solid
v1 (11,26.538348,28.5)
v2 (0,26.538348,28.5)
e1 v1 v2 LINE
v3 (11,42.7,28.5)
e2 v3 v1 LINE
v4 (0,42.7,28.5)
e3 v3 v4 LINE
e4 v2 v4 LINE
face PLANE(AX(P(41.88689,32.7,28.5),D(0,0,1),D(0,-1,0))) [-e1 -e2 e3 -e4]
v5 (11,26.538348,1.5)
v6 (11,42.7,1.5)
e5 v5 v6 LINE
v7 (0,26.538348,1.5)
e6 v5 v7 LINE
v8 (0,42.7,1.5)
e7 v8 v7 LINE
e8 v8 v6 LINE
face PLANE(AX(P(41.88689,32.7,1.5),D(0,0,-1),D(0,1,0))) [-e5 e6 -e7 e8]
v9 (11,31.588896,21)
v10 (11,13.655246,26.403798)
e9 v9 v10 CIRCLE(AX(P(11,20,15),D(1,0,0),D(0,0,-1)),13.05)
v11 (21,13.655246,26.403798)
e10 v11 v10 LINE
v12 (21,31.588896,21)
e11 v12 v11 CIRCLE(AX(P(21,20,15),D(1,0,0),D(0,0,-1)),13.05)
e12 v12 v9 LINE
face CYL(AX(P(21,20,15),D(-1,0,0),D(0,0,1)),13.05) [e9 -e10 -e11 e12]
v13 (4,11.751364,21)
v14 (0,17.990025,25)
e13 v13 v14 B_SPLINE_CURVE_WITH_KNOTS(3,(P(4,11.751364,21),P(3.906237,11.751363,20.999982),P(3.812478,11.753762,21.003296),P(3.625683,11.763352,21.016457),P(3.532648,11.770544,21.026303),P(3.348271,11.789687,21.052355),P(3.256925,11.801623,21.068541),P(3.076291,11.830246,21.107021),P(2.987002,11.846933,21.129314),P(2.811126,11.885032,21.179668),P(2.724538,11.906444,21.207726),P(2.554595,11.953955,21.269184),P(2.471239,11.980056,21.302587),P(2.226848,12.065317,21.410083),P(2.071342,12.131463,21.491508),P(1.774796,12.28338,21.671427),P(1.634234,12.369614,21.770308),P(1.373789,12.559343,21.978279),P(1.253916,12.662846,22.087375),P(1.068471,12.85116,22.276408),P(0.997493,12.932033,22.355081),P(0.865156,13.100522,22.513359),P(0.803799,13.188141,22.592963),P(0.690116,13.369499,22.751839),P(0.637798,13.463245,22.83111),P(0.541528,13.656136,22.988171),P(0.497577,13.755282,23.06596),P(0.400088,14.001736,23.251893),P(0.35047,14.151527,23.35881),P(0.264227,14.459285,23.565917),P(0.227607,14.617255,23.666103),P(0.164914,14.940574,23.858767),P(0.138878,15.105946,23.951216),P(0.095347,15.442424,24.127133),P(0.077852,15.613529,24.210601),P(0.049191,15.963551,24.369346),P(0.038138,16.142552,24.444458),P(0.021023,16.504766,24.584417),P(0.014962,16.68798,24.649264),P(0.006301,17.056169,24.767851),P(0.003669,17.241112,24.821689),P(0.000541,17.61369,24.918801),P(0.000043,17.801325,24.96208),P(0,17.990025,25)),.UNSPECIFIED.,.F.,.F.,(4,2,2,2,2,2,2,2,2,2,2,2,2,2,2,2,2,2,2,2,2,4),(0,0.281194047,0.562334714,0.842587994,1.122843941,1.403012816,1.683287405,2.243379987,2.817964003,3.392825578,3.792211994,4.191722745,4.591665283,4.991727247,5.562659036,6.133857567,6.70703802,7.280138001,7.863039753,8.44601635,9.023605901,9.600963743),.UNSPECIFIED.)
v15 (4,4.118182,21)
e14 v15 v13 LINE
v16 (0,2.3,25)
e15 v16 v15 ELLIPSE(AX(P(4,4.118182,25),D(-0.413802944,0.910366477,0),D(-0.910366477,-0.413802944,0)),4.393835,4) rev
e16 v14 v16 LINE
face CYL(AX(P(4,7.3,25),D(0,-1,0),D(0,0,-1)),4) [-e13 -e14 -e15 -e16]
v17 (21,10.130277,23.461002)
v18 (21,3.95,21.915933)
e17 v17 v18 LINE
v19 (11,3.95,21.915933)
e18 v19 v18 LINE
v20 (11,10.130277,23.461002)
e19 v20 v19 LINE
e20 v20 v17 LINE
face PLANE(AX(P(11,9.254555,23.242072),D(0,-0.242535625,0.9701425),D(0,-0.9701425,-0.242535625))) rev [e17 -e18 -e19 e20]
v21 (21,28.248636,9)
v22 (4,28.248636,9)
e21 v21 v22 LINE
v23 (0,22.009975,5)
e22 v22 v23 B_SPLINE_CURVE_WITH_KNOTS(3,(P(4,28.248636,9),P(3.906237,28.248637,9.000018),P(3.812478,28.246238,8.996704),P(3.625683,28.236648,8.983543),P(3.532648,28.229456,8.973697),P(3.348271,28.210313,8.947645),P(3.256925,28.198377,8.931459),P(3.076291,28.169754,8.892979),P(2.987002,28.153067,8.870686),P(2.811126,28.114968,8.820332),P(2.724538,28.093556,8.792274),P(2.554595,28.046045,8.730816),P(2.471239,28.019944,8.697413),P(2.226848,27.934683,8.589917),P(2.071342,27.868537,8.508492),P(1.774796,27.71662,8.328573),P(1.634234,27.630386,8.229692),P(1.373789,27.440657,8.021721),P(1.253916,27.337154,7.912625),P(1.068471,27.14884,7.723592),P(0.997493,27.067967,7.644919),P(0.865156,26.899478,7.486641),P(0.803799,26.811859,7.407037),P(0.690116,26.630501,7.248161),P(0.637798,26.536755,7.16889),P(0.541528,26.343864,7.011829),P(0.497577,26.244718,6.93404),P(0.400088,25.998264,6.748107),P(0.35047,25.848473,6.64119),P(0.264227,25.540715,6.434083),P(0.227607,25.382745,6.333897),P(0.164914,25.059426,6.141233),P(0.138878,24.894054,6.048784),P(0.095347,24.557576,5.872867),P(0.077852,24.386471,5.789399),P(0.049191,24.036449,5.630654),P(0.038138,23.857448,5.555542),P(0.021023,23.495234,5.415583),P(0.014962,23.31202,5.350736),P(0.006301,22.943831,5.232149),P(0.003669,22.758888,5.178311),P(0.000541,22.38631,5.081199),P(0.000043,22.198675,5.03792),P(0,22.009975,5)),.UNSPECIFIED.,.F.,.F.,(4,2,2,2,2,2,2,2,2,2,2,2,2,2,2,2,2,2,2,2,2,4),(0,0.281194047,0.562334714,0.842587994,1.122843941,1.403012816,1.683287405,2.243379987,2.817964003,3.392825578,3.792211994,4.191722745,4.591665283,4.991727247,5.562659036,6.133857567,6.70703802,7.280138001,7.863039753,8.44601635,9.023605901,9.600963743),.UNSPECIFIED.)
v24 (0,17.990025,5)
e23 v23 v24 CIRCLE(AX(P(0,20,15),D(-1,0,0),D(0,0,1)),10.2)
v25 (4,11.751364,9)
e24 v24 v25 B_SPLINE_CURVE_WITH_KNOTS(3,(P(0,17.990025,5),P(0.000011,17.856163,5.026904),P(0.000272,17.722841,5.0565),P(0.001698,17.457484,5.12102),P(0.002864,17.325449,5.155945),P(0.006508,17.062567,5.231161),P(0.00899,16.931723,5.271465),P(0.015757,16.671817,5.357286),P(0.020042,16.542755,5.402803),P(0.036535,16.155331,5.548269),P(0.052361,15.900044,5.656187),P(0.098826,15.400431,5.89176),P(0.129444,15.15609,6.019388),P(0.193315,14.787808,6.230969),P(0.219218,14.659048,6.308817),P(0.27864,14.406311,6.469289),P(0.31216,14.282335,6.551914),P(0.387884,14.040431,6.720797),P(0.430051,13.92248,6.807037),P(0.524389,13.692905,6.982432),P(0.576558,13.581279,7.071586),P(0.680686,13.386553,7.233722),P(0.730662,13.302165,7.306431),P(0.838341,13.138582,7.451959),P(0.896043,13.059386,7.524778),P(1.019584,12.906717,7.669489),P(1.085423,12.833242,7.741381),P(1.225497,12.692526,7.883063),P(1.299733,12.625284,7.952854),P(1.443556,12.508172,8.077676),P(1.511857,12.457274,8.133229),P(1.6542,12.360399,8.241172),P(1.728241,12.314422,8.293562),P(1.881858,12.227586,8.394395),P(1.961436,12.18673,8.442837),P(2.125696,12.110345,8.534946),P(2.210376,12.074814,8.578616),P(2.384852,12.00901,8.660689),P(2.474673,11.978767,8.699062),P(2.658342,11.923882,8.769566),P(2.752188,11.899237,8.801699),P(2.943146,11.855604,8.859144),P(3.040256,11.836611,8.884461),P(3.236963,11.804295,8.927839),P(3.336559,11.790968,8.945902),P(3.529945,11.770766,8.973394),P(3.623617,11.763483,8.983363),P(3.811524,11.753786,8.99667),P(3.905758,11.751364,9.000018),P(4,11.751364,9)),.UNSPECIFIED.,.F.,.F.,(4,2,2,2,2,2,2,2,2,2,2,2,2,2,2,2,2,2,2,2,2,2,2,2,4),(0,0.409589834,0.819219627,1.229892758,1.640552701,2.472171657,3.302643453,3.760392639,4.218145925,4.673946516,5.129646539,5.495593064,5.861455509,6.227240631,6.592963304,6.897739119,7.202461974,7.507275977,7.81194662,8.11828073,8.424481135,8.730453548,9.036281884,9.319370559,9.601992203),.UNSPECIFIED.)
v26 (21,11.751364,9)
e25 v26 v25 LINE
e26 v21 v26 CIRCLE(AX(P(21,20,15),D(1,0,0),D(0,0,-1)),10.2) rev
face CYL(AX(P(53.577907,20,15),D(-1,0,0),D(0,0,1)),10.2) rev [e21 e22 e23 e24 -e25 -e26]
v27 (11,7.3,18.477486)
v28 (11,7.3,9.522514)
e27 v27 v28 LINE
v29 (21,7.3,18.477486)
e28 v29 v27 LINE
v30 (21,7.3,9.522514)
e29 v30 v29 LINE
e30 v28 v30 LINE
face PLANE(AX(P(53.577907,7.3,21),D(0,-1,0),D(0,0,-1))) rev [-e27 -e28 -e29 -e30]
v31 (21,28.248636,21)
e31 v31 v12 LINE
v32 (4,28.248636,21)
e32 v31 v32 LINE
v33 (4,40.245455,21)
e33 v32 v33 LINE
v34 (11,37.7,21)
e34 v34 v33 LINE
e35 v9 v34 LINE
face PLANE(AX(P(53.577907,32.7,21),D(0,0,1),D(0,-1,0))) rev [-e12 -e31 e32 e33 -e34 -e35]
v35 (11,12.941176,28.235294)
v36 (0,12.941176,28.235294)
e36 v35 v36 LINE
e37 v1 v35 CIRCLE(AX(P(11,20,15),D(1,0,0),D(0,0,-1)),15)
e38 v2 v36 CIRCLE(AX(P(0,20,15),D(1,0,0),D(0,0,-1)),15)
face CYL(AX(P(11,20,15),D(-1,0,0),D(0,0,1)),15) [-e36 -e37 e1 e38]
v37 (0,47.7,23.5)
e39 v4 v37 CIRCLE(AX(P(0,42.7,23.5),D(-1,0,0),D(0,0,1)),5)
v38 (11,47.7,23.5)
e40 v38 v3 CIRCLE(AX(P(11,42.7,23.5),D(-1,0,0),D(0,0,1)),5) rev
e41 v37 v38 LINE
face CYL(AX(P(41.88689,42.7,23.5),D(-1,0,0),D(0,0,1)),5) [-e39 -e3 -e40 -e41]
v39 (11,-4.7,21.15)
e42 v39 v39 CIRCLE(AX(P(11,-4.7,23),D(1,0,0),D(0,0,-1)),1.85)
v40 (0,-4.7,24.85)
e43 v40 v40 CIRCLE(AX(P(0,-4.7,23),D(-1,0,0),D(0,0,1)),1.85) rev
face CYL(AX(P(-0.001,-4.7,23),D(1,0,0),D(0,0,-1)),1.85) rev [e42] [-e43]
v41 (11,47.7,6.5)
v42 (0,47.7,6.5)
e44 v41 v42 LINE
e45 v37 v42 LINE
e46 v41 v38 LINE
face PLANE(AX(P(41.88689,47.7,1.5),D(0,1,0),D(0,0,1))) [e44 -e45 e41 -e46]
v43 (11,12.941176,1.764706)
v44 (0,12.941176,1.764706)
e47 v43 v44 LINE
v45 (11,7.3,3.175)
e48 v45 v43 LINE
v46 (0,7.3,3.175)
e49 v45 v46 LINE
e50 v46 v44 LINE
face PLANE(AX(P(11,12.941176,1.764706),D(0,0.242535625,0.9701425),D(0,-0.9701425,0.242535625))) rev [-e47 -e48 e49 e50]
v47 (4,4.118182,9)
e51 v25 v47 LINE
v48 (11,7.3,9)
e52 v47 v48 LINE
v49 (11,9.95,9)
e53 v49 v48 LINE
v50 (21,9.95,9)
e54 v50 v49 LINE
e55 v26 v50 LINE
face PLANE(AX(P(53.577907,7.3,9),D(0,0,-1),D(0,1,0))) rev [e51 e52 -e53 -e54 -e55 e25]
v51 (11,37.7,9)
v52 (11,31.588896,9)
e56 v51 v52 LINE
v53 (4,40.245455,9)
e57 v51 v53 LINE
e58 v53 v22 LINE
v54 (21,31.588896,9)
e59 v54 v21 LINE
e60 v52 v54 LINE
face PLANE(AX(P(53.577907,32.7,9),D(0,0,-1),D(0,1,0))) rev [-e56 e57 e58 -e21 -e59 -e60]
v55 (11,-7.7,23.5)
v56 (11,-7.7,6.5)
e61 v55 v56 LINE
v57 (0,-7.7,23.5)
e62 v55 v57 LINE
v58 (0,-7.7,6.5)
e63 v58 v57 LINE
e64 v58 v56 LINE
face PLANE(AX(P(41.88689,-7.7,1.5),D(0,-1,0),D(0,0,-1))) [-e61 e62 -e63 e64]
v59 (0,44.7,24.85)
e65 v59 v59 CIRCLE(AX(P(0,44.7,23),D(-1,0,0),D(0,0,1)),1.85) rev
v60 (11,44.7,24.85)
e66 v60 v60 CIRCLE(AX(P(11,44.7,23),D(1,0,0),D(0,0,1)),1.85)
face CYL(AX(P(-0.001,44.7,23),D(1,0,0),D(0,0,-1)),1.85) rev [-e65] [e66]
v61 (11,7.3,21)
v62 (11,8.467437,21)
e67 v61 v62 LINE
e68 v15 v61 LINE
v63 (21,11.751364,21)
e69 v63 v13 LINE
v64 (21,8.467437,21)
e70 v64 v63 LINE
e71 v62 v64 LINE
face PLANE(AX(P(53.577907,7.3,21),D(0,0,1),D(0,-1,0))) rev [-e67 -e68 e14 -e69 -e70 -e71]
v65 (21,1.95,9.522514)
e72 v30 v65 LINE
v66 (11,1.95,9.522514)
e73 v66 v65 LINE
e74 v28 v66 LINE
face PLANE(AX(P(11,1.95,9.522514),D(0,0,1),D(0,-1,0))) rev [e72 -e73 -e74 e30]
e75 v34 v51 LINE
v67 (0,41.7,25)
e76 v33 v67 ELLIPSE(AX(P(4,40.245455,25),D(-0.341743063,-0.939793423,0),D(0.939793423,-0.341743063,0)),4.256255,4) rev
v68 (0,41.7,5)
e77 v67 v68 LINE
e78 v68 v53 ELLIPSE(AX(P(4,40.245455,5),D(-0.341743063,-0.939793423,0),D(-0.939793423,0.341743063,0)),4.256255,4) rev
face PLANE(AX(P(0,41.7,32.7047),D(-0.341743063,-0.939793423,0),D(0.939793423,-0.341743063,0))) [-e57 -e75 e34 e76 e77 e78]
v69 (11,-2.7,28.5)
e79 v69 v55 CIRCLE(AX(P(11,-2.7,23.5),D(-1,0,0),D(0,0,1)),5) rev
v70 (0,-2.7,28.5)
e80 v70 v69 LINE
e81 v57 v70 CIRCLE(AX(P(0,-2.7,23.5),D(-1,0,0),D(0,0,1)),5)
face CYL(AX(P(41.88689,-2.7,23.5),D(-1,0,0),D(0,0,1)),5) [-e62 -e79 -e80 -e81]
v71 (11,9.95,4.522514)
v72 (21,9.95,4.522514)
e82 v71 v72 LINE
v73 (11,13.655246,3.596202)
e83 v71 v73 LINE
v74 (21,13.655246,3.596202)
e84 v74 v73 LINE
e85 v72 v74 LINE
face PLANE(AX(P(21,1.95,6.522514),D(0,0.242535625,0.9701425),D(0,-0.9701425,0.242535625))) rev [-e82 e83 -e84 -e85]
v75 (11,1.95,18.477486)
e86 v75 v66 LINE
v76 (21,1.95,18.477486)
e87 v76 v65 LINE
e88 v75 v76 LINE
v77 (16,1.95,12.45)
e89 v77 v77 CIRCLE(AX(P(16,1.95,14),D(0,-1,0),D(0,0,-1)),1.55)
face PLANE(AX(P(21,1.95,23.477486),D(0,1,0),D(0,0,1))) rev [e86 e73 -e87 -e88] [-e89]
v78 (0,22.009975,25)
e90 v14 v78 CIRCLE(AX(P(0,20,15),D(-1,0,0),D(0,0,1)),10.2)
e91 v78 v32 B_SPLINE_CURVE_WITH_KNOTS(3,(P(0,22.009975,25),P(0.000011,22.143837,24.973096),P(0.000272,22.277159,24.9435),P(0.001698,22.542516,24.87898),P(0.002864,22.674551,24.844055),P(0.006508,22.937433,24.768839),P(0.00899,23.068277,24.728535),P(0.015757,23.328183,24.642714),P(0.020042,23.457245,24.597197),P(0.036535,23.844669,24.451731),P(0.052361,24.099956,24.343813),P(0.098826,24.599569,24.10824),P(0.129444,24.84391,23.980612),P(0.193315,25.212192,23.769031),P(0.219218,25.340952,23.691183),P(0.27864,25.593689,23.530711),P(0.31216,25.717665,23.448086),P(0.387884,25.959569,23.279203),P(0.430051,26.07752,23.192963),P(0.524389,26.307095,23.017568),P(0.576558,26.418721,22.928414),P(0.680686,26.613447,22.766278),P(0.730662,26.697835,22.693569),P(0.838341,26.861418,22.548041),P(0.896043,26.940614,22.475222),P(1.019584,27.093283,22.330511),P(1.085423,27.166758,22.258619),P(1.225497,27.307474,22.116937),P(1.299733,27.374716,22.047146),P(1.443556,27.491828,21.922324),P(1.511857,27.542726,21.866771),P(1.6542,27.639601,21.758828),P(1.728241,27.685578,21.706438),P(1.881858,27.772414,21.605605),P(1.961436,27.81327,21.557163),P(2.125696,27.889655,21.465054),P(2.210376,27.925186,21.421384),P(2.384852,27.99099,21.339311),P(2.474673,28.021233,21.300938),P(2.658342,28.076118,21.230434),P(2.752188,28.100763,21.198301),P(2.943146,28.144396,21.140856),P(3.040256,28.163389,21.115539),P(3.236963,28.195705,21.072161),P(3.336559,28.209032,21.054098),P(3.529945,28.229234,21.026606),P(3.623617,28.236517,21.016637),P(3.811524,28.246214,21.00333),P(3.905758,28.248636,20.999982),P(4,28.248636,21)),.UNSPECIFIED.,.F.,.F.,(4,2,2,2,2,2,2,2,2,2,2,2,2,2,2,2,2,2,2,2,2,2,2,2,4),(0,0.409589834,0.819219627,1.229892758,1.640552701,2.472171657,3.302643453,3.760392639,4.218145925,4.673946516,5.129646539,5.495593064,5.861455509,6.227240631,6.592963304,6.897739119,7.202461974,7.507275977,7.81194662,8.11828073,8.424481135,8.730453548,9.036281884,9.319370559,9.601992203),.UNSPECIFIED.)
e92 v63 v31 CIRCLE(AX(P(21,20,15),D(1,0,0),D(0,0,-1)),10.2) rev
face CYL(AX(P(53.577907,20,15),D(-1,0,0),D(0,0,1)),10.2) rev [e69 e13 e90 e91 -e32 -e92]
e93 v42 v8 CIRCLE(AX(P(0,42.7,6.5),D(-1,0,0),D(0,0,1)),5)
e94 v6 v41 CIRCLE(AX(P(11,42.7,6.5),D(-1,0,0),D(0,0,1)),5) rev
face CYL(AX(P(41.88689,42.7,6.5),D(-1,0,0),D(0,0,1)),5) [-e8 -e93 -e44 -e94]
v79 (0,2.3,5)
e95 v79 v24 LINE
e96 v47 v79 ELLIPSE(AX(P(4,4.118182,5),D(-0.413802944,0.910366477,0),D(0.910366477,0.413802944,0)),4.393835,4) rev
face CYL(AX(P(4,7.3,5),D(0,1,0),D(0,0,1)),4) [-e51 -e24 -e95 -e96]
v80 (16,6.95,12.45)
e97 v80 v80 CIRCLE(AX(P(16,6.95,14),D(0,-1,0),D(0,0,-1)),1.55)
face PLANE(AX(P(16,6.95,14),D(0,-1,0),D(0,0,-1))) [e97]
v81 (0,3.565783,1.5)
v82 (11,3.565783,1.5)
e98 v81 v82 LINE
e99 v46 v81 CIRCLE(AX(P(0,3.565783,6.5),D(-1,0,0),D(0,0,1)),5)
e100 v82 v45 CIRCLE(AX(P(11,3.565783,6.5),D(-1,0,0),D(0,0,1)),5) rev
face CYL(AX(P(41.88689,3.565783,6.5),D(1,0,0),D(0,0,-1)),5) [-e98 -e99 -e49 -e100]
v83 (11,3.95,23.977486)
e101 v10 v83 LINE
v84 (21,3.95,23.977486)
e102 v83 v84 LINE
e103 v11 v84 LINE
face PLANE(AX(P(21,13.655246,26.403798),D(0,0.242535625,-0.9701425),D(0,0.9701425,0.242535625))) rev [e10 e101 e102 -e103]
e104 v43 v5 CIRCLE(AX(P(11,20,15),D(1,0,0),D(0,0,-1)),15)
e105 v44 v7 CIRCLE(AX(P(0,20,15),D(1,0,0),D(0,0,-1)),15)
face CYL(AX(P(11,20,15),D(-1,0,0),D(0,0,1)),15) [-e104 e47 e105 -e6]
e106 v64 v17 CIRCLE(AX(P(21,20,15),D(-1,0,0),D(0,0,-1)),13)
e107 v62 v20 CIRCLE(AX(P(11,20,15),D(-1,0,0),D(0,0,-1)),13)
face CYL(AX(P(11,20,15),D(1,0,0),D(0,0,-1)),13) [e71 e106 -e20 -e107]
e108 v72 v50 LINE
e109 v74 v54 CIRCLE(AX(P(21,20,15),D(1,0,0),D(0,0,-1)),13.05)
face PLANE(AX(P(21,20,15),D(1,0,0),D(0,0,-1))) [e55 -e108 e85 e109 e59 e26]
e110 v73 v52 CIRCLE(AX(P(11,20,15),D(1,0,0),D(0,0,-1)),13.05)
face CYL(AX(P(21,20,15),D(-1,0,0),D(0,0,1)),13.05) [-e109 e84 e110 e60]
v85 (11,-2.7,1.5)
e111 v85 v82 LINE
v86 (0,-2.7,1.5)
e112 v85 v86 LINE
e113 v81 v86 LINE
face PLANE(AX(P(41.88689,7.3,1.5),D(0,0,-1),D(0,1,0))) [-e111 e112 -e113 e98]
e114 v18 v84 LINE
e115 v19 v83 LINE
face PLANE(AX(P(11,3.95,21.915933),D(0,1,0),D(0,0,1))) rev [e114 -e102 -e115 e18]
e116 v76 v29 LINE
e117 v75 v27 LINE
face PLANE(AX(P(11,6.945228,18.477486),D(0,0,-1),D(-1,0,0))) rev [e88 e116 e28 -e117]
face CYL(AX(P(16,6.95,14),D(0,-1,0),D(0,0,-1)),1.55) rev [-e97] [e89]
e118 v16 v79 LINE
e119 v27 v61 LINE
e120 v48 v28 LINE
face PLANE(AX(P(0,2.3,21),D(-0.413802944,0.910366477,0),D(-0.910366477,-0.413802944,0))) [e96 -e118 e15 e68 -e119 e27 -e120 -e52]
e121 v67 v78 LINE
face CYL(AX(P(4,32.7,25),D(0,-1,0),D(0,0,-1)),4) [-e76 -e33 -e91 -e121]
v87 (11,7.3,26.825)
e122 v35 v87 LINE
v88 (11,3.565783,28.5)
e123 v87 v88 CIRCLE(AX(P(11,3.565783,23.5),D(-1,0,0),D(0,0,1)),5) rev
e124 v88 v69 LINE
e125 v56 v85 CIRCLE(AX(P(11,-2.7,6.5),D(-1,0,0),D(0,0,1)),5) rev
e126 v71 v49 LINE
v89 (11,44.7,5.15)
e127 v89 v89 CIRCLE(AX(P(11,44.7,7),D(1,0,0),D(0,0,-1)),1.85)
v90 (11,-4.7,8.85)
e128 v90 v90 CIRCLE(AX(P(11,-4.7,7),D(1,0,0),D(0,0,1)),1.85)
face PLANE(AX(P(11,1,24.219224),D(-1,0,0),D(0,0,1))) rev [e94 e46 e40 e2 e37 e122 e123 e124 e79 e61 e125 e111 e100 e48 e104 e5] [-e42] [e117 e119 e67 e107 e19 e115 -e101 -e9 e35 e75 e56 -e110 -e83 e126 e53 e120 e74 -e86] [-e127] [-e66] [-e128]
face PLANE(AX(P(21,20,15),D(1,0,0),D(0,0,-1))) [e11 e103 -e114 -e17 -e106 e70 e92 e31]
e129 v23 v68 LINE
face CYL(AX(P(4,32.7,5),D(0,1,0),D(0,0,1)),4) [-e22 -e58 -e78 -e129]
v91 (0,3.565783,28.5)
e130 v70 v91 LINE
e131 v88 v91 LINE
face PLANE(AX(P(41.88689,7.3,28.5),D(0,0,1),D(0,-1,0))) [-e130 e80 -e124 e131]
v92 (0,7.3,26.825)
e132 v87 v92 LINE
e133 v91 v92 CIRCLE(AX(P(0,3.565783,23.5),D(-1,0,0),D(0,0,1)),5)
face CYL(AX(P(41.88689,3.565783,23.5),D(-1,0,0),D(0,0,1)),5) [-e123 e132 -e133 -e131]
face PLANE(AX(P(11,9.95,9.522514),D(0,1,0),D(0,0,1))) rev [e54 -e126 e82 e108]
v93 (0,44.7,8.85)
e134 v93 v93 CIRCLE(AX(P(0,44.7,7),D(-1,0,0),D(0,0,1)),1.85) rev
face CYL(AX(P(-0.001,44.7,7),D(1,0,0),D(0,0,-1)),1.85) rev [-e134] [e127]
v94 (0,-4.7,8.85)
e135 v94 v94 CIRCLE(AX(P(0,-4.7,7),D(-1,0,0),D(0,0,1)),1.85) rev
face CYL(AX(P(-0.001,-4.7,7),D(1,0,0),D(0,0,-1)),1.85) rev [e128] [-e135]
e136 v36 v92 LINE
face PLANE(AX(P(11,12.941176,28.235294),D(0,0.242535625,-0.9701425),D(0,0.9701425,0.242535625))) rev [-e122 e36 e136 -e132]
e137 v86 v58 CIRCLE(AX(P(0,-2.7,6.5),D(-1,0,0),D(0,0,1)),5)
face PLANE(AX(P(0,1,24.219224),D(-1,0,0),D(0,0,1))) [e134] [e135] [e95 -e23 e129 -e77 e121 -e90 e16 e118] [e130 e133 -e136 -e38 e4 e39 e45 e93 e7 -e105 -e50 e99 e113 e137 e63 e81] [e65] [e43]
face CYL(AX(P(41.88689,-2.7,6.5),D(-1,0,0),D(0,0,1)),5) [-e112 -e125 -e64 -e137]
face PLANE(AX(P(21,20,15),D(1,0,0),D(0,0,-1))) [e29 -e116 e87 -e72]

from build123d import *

# Parameters (mm, degrees)
CROQUIS1_R              = 10
SALIENTE_EXTRUIR1_DEPTH = 11
CROQUIS2_R              = 10
SALIENTE_EXTRUIR2_DEPTH = 10
CORTAR_EXTRUIR3_DEPTH   = 10
CROQUIS8_R              = 1.55
CORTAR_EXTRUIR4_DEPTH   = 5
CORTAR_EXTRUIR5_REACH   = 52.656
CORTAR_EXTRUIR6_START   = -10
CORTAR_EXTRUIR6_DEPTH   = 10
SALIENTE_EXTRUIR5_DEPTH = 11
CORTAR_EXTRUIR9_REACH   = 59.413
CROQUIS19_R             = 1.85
SALIENTE_EXTRUIR7_DEPTH = 11
CROQUIS22_W             = 11
CROQUIS22_H             = 5
CORTAR_EXTRUIR10_DEPTH  = 12
CORTAR_EXTRUIR11_DEPTH  = 12
REDONDEO1_R             = 4
REDONDEO2_R             = 5
REDONDEO3_R             = 5


with BuildPart() as part:
    # Croquis1 → Saliente-Extruir1 (new body)
    with BuildSketch(Plane(origin=(0, 0, 0), x_dir=(0, 0, -1), z_dir=(1, 0, 0))):
        with BuildLine():
            Line((-5.780776406, 0), (-24.219223594, 0))
            ThreePointArc((-24.219223594, 0), (-24.834635803, 0.211794562), (-25.189366094, 0.757464375))
            Line((-25.189366094, 0.757464375), (-28.235294118, 12.941176471))
            ThreePointArc((-28.235294118, 12.941176471), (-15, 35), (-1.764705882, 12.941176471))
            Line((-1.764705882, 12.941176471), (-4.810633906, 0.757464375))
            ThreePointArc((-4.810633906, 0.757464375), (-5.165364197, 0.211794562), (-5.780776406, 0))
        make_face()
        with Locations((-15, 20)):
            Circle(CROQUIS1_R, mode=Mode.SUBTRACT)
    extrude(amount=SALIENTE_EXTRUIR1_DEPTH)

    # Croquis2 → Saliente-Extruir2 (add)
    with BuildSketch(Plane(origin=(11, 0, 0), x_dir=(0, 0, -1), z_dir=(1, 0, 0))):
        with BuildLine():
            Line((-23.477486008, 1.95), (-6.522513992, 1.95))
            Line((-6.522513992, 1.95), (-3.59620246, 13.655246131))
            ThreePointArc((-3.59620246, 13.655246131), (-15, 33.05), (-26.40379754, 13.655246131))
            Line((-26.40379754, 13.655246131), (-23.477486008, 1.95))
        make_face()
        with Locations((-15, 20)):
            Circle(CROQUIS2_R, mode=Mode.SUBTRACT)
    extrude(amount=SALIENTE_EXTRUIR2_DEPTH)

    # Croquis3 → Cortar-Extruir3 (cut)
    with BuildSketch(Plane(origin=(21, 0, 0), x_dir=(0, 0, -1), z_dir=(1, 0, 0))):
        Polygon((-9.522513992, 1.95), (-9.522513992, 9.95), (-4.522513992, 9.95), (-6.522513992, 1.95), align=None)
        with BuildLine():
            Line((-23.477486008, 1.95), (-18.477486008, 1.95))
            Line((-18.477486008, 1.95), (-18.477486008, 6.945227656))
            Line((-18.477486008, 6.945227656), (-18.477486008, 7.473743933))
            ThreePointArc((-18.477486008, 7.473743933), (-21.115240601, 8.528128645), (-23.461002355, 10.130276643))
            Line((-23.461002355, 10.130276643), (-23.242071918, 9.254554893))
            Line((-23.242071918, 9.254554893), (-21.915933195, 3.95))
            Line((-21.915933195, 3.95), (-23.977486008, 3.95))
            Line((-23.977486008, 3.95), (-23.477486008, 1.95))
        make_face()
    extrude(amount=-CORTAR_EXTRUIR3_DEPTH, mode=Mode.SUBTRACT)

    # Croquis8 → Cortar-Extruir4 (cut)
    with BuildSketch(Plane.XZ.offset(-1.95)):
        with Locations(Location((16, 14, 0), (0, 0, 270))):
            Circle(CROQUIS8_R)
    extrude(amount=-CORTAR_EXTRUIR4_DEPTH, mode=Mode.SUBTRACT)

    # Cortar-Extruir5: up to this face of the body (flat: up to its plane)
    cortar_extruir5_end = Plane(part.part.faces().sort_by_distance((21, 32.643992611, 15))[0])
    # Croquis11 → Cortar-Extruir5 (cut, up to the picked face)
    with BuildSketch(Plane.ZY, mode=Mode.PRIVATE) as cortar_extruir5_sk1:
        with BuildLine():
            Line((21, 32.7), (9, 32.7))
            Line((9, 32.7), (9, 28.248636251))
            ThreePointArc((9, 28.248636251), (4.8, 20), (9, 11.751363749))
            Line((9, 11.751363749), (9, 7.3))
            Line((9, 7.3), (21, 7.3))
            Line((21, 7.3), (21, 11.751363749))
            ThreePointArc((21, 11.751363749), (25.2, 20), (21, 28.248636251))
            Line((21, 28.248636251), (21, 32.7))
        make_face()
    cortar_extruir5_tool1 = split(extrude(cortar_extruir5_sk1.sketch, amount=-CORTAR_EXTRUIR5_REACH, mode=Mode.PRIVATE), bisect_by=cortar_extruir5_end, keep=Keep.BOTH, mode=Mode.PRIVATE)
    add(cortar_extruir5_tool1.solids().sort_by(Axis((0, 20, 15), (1, 0, 0)))[0], mode=Mode.SUBTRACT)

    # Croquis12 → Cortar-Extruir6 (cut)
    with BuildSketch(Plane(origin=(21, 0, 0), x_dir=(0, 0, -1), z_dir=(1, 0, 0)).offset(CORTAR_EXTRUIR6_START)):
        with BuildLine():
            Line((-18.00208261, 32.7), (-11.99791739, 32.7))
            ThreePointArc((-11.99791739, 32.7), (-15, 33.05), (-18.00208261, 32.7))
        make_face()
    extrude(amount=CORTAR_EXTRUIR6_DEPTH, mode=Mode.SUBTRACT)

    # Croquis18 → Saliente-Extruir5 (add)
    with BuildSketch(Plane.ZY):
        with BuildLine():
            Line((1.5, 7.3), (3.175, 7.3))
            Line((3.175, 7.3), (4.810633906, 0.757464375))
            ThreePointArc((4.810633906, 0.757464375), (5.165364197, 0.211794562), (5.780776406, 0))
            Line((5.780776406, 0), (24.219223594, 0))
            ThreePointArc((24.219223594, 0), (24.834635803, 0.211794562), (25.189366094, 0.757464375))
            Line((25.189366094, 0.757464375), (26.825, 7.3))
            Line((26.825, 7.3), (28.5, 7.3))
            Line((28.5, 7.3), (28.5, -7.7))
            Line((28.5, -7.7), (1.5, -7.7))
            Line((1.5, -7.7), (1.5, 7.3))
        make_face()
        with BuildLine():
            Line((1.5, 47.7), (28.5, 47.7))
            Line((28.5, 47.7), (28.5, 32.7))
            Line((28.5, 32.7), (22.981854421, 32.7))
            ThreePointArc((22.981854421, 32.7), (15, 35), (7.018145579, 32.7))
            Line((7.018145579, 32.7), (1.5, 32.7))
            Line((1.5, 32.7), (1.5, 47.7))
        make_face()
    extrude(amount=-SALIENTE_EXTRUIR5_DEPTH)

    # Croquis19 → Cortar-Extruir9 (cut, up to next)
    with BuildSketch(Plane(origin=(11, 0, 0), x_dir=(0, 0, -1), z_dir=(1, 0, 0)), mode=Mode.PRIVATE) as cortar_extruir9_sk1:
        with Locations((-23, -4.7)):
            Circle(CROQUIS19_R)
    cortar_extruir9_tool1 = extrude(cortar_extruir9_sk1.sketch, amount=-CORTAR_EXTRUIR9_REACH, mode=Mode.PRIVATE) & part.part
    # Croquis19 → Cortar-Extruir9 (cut, up to next)
    with BuildSketch(Plane(origin=(11, 0, 0), x_dir=(0, 0, -1), z_dir=(1, 0, 0)), mode=Mode.PRIVATE) as cortar_extruir9_sk2:
        with Locations(Location((-7, -4.7, 0), (0, 0, 180))):
            Circle(CROQUIS19_R)
    cortar_extruir9_tool2 = extrude(cortar_extruir9_sk2.sketch, amount=-CORTAR_EXTRUIR9_REACH, mode=Mode.PRIVATE) & part.part
    # Croquis19 → Cortar-Extruir9 (cut, up to next)
    with BuildSketch(Plane(origin=(11, 0, 0), x_dir=(0, 0, -1), z_dir=(1, 0, 0)), mode=Mode.PRIVATE) as cortar_extruir9_sk3:
        with Locations((-7, 44.7)):
            Circle(CROQUIS19_R)
    cortar_extruir9_tool3 = extrude(cortar_extruir9_sk3.sketch, amount=-CORTAR_EXTRUIR9_REACH, mode=Mode.PRIVATE) & part.part
    # Croquis19 → Cortar-Extruir9 (cut, up to next)
    with BuildSketch(Plane(origin=(11, 0, 0), x_dir=(0, 0, -1), z_dir=(1, 0, 0)), mode=Mode.PRIVATE) as cortar_extruir9_sk4:
        with Locations(Location((-23, 44.7, 0), (0, 0, 180))):
            Circle(CROQUIS19_R)
    cortar_extruir9_tool4 = extrude(cortar_extruir9_sk4.sketch, amount=-CORTAR_EXTRUIR9_REACH, mode=Mode.PRIVATE) & part.part
    add(cortar_extruir9_tool1.solids().sort_by_distance((11, -4.7, 23))[0], mode=Mode.SUBTRACT)
    add(cortar_extruir9_tool2.solids().sort_by_distance((11, -4.7, 7))[0], mode=Mode.SUBTRACT)
    add(cortar_extruir9_tool3.solids().sort_by_distance((11, 44.7, 7))[0], mode=Mode.SUBTRACT)
    add(cortar_extruir9_tool4.solids().sort_by_distance((11, 44.7, 23))[0], mode=Mode.SUBTRACT)

    # Croquis21 → Saliente-Extruir7 (add)
    with BuildSketch(Plane.ZY):
        with BuildLine():
            Line((22.981854421, 32.7), (28.5, 32.7))
            Line((28.5, 32.7), (28.5, 26.538348415))
            ThreePointArc((28.5, 26.538348415), (26.174032616, 30.007047272), (22.981854421, 32.7))
        make_face()
        with BuildLine():
            Line((1.5, 32.7), (7.018145579, 32.7))
            ThreePointArc((7.018145579, 32.7), (3.825967384, 30.007047272), (1.5, 26.538348415))
            Line((1.5, 26.538348415), (1.5, 32.7))
        make_face()
    extrude(amount=-SALIENTE_EXTRUIR7_DEPTH)

    # Croquis22 → Cortar-Extruir10 (cut)
    with BuildSketch(Plane.XY.offset(9)):
        Polygon((0, 7.3), (0, 2.3), (11, 7.3), align=None)
        with Locations((5.5, 35.2)):
            Rectangle(CROQUIS22_W, CROQUIS22_H)
    extrude(amount=CORTAR_EXTRUIR10_DEPTH, mode=Mode.SUBTRACT)

    # Croquis23 → Cortar-Extruir11 (cut)
    with BuildSketch(Plane.XY.offset(9)):
        Polygon((0, 37.7), (11, 37.7), (0, 41.7), align=None)
    extrude(amount=CORTAR_EXTRUIR11_DEPTH, mode=Mode.SUBTRACT)

    # Redondeo1
    redondeo1_edges = [part.edges().sort_by_distance(p)[0] for p in [
        (0, 34.974318125, 21),
        (0, 34.974318125, 9),
        (0, 7.025681875, 9),
        (0, 7.025681875, 21),
    ]]
    fillet(redondeo1_edges, radius=REDONDEO1_R)

    # Redondeo2
    # the kernel refuses this fillet: 5 mm, written as the material it takes off along each edge
    with BuildSketch(Plane(origin=(-9.335541963, 7.3, 28.5), x_dir=(0, 0, -1), z_dir=(1, 0, 0))) as redondeo2_piece_1:
        with BuildLine():
            CenterArc((5, -3.734216785), REDONDEO2_R, 131.682325393, 48.317674607)
            Line((0, -3.734216785), (-0.1, -3.734216785))
            Line((-0.1, -3.734216785), (-0.1, 0))
            Line((-0.1, 0), (0, 0.1))
            ThreePointArc((0, 0.1), (0.8375, 0.1), (1.6085, 0.074684336))
            Line((1.6085, 0.074684336), (1.675, 0))
        make_face()
    extrude(amount=29.671083927, mode=Mode.SUBTRACT)
    with BuildSketch(Plane(origin=(-9.335541963, 7.3, 1.5), x_dir=(0, -1, 0), z_dir=(1, 0, 0))) as redondeo2_piece_2:
        with BuildLine():
            CenterArc((3.734216785, -5), REDONDEO2_R, 90, 48.317674607)
            Line((0, -1.675), (-0.074684336, -1.6085))
            ThreePointArc((-0.074684336, -1.6085), (-0.1, -0.8375), (-0.1, 0))
            Line((-0.1, 0), (0, 0.1))
            Line((0, 0.1), (3.734216785, 0.1))
            Line((3.734216785, 0.1), (3.734216785, 0))
        make_face()
    extrude(amount=29.671083927, mode=Mode.SUBTRACT)

    # Redondeo3
    redondeo3_edges = [part.edges().sort_by_distance(p)[0] for p in [
        (5.5, -7.7, 1.5),
        (5.5, -7.7, 28.5),
        (5.5, 47.7, 1.5),
        (5.5, 47.7, 28.5),
    ]]
    fillet(redondeo3_edges, radius=REDONDEO3_R)


solid = part.part
